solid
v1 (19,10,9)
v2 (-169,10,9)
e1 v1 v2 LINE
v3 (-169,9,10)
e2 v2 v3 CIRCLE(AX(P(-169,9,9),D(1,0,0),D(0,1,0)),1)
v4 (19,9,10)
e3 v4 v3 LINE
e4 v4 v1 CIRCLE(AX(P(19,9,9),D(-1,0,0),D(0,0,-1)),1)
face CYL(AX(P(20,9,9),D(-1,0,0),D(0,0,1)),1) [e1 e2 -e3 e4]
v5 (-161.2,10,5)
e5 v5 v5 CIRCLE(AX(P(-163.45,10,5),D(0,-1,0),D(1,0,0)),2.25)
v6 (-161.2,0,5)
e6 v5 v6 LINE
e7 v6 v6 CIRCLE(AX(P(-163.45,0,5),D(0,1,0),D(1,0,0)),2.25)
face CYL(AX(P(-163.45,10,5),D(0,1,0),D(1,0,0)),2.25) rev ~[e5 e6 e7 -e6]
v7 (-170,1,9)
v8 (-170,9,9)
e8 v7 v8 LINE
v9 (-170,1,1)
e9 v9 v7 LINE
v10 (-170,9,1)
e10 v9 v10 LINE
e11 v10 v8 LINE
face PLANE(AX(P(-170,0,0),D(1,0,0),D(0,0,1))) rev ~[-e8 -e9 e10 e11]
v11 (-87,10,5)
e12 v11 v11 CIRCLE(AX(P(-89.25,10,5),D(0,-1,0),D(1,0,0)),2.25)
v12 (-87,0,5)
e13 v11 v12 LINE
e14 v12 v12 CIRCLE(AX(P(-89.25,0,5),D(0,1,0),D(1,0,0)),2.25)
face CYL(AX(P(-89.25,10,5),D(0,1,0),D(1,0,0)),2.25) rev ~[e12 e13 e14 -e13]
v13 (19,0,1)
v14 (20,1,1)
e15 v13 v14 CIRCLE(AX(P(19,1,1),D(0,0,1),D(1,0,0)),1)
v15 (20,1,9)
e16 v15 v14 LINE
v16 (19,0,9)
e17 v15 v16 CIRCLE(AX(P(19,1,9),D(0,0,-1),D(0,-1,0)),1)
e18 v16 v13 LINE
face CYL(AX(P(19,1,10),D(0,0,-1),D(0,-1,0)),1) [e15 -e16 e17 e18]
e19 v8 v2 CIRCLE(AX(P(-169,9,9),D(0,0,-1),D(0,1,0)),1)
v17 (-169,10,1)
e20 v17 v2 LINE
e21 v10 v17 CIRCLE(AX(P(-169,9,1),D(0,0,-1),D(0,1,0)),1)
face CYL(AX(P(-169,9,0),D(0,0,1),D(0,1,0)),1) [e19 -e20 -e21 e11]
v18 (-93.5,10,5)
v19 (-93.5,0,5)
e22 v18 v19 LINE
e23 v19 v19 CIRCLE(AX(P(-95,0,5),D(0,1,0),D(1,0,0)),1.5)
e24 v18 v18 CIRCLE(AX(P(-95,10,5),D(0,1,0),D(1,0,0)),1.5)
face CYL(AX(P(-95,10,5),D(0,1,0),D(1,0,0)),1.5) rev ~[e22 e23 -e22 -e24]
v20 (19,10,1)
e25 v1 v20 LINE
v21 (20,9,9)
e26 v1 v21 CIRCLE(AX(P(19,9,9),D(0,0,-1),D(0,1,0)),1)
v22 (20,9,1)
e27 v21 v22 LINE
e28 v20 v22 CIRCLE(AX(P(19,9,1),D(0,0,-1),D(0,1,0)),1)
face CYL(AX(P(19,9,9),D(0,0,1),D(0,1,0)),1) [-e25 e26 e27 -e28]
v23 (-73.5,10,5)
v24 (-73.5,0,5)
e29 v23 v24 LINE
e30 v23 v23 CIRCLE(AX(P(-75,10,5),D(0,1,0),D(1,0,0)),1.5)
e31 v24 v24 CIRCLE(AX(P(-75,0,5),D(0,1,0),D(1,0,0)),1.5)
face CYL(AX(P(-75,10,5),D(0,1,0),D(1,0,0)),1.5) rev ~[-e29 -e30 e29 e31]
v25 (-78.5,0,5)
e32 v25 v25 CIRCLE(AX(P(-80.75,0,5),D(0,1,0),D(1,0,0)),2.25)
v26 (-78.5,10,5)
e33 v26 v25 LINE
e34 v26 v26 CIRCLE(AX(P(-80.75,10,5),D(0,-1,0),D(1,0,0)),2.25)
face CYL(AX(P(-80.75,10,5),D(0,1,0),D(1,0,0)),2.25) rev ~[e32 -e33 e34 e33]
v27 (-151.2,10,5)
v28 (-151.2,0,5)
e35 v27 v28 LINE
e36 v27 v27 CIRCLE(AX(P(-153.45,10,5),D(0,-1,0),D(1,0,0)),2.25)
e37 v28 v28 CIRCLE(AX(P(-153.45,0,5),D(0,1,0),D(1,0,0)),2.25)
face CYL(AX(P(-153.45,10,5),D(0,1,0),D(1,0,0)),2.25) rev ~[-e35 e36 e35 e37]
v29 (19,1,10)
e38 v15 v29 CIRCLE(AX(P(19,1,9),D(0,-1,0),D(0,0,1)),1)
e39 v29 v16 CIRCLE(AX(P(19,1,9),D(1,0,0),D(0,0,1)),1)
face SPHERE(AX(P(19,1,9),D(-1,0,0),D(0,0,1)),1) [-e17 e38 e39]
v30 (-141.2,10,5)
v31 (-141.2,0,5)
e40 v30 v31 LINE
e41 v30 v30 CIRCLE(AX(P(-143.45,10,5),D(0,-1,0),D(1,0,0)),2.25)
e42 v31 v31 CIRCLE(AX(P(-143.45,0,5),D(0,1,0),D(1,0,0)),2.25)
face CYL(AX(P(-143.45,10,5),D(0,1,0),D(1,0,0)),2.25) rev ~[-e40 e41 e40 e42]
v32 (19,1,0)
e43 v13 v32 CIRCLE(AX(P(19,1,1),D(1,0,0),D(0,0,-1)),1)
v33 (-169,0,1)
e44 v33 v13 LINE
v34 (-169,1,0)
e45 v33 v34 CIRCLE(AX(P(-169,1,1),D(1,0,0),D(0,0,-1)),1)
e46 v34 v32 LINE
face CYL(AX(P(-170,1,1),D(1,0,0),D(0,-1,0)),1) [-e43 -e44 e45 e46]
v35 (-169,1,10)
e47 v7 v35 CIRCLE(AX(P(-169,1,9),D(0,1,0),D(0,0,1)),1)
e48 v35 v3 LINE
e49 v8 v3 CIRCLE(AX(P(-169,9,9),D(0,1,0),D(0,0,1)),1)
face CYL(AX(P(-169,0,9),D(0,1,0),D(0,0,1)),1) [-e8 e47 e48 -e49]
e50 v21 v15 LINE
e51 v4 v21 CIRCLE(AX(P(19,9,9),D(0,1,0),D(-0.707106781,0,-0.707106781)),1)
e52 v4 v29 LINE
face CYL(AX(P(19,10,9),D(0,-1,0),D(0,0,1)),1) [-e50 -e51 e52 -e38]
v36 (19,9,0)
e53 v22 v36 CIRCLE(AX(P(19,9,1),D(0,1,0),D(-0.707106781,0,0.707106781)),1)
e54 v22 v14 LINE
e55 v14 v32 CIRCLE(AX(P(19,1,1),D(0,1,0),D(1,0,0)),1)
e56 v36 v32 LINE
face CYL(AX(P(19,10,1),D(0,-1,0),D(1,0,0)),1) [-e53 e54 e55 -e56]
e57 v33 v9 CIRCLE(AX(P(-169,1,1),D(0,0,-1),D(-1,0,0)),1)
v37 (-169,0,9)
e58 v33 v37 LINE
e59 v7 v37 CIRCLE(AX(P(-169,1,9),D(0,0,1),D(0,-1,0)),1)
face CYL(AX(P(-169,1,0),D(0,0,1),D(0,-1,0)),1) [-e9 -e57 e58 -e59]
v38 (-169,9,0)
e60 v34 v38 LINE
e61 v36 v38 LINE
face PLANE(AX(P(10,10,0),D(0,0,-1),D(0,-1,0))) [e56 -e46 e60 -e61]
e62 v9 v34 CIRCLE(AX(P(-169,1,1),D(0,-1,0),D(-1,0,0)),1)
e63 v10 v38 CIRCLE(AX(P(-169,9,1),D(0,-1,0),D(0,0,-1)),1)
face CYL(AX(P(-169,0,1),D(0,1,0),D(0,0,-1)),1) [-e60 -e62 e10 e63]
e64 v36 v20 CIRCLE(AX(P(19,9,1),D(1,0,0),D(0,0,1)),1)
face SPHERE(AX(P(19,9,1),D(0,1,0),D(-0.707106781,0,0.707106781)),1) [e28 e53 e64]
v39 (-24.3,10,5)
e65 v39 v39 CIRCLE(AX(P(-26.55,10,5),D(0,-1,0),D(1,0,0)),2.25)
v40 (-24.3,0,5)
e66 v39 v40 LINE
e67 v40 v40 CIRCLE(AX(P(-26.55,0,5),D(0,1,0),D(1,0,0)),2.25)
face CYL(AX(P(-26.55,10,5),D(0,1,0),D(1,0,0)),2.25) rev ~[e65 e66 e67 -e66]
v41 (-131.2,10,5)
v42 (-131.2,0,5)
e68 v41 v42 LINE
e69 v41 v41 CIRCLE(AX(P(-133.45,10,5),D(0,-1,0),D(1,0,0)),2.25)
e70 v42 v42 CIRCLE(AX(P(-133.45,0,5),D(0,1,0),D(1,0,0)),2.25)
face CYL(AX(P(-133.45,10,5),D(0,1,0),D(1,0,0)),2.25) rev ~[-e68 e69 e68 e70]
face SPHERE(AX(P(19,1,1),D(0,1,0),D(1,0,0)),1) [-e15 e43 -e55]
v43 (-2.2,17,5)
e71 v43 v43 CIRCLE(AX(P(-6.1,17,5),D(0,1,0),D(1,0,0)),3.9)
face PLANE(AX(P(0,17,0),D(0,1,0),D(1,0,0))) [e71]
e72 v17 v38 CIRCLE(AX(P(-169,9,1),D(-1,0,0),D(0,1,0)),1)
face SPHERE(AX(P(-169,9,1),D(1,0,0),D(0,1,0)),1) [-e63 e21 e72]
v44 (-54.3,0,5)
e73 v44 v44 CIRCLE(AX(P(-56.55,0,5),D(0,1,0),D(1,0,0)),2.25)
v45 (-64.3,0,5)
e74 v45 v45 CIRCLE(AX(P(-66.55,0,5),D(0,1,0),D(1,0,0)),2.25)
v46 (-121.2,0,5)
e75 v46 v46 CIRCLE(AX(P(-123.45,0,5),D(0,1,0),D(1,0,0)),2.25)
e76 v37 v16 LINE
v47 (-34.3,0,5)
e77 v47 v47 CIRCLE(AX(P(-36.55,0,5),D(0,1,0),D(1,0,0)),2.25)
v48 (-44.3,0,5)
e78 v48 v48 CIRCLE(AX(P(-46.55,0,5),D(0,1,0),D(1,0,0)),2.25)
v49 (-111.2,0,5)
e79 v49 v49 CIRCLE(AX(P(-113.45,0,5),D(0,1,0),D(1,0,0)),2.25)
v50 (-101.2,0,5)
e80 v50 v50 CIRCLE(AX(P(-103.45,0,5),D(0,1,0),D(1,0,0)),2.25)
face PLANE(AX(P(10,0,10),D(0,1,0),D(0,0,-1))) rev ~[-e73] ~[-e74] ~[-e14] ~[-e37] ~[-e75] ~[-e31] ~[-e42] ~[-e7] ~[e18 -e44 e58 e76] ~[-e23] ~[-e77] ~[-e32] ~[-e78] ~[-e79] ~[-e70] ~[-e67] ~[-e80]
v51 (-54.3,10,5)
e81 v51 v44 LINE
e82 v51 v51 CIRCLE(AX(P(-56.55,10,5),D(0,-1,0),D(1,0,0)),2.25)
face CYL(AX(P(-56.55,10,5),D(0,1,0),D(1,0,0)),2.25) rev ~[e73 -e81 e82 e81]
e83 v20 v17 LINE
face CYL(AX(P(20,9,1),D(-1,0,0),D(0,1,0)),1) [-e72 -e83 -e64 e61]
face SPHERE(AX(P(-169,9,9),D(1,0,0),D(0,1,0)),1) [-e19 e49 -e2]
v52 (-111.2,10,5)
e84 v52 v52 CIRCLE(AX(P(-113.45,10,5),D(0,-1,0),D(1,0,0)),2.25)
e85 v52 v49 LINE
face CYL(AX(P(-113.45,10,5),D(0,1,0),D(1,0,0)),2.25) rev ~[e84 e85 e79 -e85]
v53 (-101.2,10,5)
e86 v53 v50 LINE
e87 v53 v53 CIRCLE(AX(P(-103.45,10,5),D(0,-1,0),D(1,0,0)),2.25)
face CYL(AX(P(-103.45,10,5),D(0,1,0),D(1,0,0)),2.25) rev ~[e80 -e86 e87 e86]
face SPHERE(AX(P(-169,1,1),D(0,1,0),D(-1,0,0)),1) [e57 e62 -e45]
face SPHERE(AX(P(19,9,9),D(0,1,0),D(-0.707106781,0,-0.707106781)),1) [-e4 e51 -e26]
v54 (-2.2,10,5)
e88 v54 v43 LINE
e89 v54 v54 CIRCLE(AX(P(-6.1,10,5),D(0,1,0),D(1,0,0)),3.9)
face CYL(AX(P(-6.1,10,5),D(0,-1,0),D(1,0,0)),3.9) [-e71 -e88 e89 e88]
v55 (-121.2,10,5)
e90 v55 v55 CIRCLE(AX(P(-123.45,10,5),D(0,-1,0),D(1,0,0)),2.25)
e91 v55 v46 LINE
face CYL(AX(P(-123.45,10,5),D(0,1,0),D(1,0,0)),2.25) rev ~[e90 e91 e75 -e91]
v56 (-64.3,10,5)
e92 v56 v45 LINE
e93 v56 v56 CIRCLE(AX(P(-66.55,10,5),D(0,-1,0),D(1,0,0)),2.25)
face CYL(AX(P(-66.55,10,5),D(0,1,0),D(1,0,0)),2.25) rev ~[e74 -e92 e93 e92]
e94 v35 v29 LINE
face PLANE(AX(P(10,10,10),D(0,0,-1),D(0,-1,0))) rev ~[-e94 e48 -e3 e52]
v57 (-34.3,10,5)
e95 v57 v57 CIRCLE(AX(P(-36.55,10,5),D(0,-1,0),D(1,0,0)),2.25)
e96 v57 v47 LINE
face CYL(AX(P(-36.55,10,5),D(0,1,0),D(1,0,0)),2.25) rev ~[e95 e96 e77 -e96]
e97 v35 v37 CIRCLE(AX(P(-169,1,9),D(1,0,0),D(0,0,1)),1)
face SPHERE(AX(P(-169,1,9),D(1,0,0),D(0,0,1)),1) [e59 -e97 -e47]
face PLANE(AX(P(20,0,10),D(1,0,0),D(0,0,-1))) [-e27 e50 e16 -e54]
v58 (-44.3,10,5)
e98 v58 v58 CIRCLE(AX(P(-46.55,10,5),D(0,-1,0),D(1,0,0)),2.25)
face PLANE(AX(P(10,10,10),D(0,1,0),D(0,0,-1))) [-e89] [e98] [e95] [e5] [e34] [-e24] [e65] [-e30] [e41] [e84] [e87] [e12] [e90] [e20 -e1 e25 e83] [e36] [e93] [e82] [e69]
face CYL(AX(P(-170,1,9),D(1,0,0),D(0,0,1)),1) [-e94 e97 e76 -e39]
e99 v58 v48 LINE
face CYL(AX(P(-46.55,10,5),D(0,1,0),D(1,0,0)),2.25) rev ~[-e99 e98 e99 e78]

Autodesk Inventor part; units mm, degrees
ref_plane "YZ Plane" through (0, 0, 0) normal (1, 0, 0) x (0, 1, 0)
ref_plane "XZ Plane" through (0, 0, 0) normal (0, 1, 0) x (-1, 0, 0)
ref_plane "XY Plane" through (0, 0, 0) normal (0, 0, 1) x (1, 0, 0)
sketch "Sketch1" plane through (0, 0, 0) normal (0, 1, 0) x (-1, 0, 0)
  line L0 (0, 0) -> (170, 0)
  line L1 (170, 0) -> (170, 10)
  line L2 (170, 10) -> (0, 10)
  line L3 (0, 10) -> (0, 0)
  dimension "d0" = 170
  dimension "d1" = 10
extrude "Extrusion1" add sketch "Sketch1" along normal blind 10
sketch "Sketch2" plane through (0, 10, 0) normal (0, 1, 0) x (1, 0, 0)
  line L0 (0, -10) -> (0, 0) projected
  line L1 (0, -5) -> (-2.2, -5)
  circle A0 centre (-6.1, -5) radius 3.9
  line L2 (0, 0) -> (-170, 0) projected
  line L3 (-170, -10) -> (0, -10) projected
  circle A1 centre (-75, -5) radius 1.5
  circle A2 centre (-95, -5) radius 1.5
  dimension "d35" = 10
  dimension "d4" = 2.2
  dimension "d8" = 3
  dimension "d9" = 3
extrude "Extrusion2" cut sketch "Sketch2" against normal blind 10 contours A1
extrude "Extrusion3" cut sketch "Sketch2" against normal blind 10 contours A2
extrude "Extrusion4" add sketch "Sketch2" along normal blind 7 contours A0
sketch "Sketch3" plane through (0, 10, 0) normal (0, 1, 0) x (1, 0, 0)
  line L0 (-170, 0) -> (-170, -10) projected
  line L1 (-170, -5) -> (-10, -5)
  circle A0 centre (-6.1, -5) radius 3.9 projected
  line L2 (-165.7, -5) -> (-163.45, -5)
  circle A1 centre (-163.45, -5) radius 2.25
  circle A2 centre (-153.45, -5) radius 2.25
  circle A3 centre (-143.45, -5) radius 2.25
  circle A4 centre (-133.45, -5) radius 2.25
  circle A5 centre (-123.45, -5) radius 2.25
  circle A6 centre (-113.45, -5) radius 2.25
  circle A7 centre (-103.45, -5) radius 2.25
  circle A8 centre (-95, -5) radius 1.5 projected
  line L3 (-93.5, -5) -> (-93.5, -7.9104)
  circle A9 centre (-75, -5) radius 1.5 projected
  line L4 (-76.5, -5) -> (-76.5, -7.25)
  line L5 (-93.5, -5) -> (-76.5, -5)
  line L6 (-85, -5) -> (-93.5, -5)
  line L7 (-85, -5) -> (-76.5, -5)
  circle A10 centre (-80.75, -5) radius 2.25
  circle A11 centre (-89.25, -5) radius 2.25
  line L8 (-10, -5) -> (-12, -5)
  line L9 (-10, -5) -> (-14.3, -5)
  line L10 (-14.3, -5) -> (-16.55, -5)
  circle A12 centre (-16.55, -5) radius 2.25
  circle A13 centre (-26.55, -5) radius 2.25
  circle A14 centre (-36.55, -5) radius 2.25
  circle A15 centre (-46.55, -5) radius 2.25
  circle A16 centre (-56.55, -5) radius 2.25
  circle A17 centre (-66.55, -5) radius 2.25
  point P0 (0, 0)
  point P1 (-155.7, -5)
  point P2 (-145.7, -5)
  point P3 (-135.7, -5)
  point P4 (-125.7, -5)
  point P5 (-115.7, -5)
  point P6 (-105.7, -5)
  point P7 (-24.3, -5)
  point P8 (-34.3, -5)
  point P9 (-44.3, -5)
  point P10 (-54.3, -5)
  point P11 (-64.3, -5)
  dimension "d20" = 10
  dimension "d32" = 10
extrude "Extrusion5" cut sketch "Sketch3" against normal blind 10 contours A1 L1 | L1 A1 | L1 A12 | L1 A12 | A2 L1 | L1 A2 | A3 L1 | L1 A3 | A4 L1 | L1 A4 | A5 L1 | L1 A5 | A6 L1 | L1 A6 | A7 L1 | L1 A7 | A11 L1 | L1 A11 | A10 L1 | L1 A10 | A17 L1 | L1 A17 | A16 L1 | L1 A16 | A15 L1 | L1 A15 | A14 L1 | L1 A14 | A13 L1 | L1 A13
thread "Thread1" size "M3x0.5" class "6H" standard "ANSI Metric M Profile" full length
thread "Thread2" size "M3x0.5" class "6H" standard "ANSI Metric M Profile" full length
sketch "Sketch4" plane through (0, 10, 0) normal (0, 1, 0) x (1, 0, 0)
  circle A0 centre (-16.55, -5) radius 2.25 projected
  circle A1 centre (-16.55, -5) radius 2.25
  point P0 (0, 0)
extrude "Extrusion6" add sketch "Sketch4" against normal blind 10
sketch "Sketch5" plane through (0, 0, 10) normal (1, 0, 0) x (0, 0, -1)
  line L0 (10, 0) -> (0, 0) projected
  line L1 (0, 0) -> (0, 10) projected
  line L2 (10, 0) -> (0, 0)
  line L3 (0, 0) -> (0, 10)
  line L4 (0, 10) -> (10, 10)
  line L5 (10, 10) -> (10, 0)
extrude "Extrusion7" add sketch "Sketch5" along normal blind 10
sketch "Sketch6" plane through (10, 0, 10) normal (1, 0, 0) x (0, 0, -1)
  line L0 (0, 0) -> (10, 0) projected
  line L1 (0, 10) -> (0, 0) projected
  line L2 (10, 0) -> (0, 0)
  line L3 (0, 0) -> (0, 10)
  line L4 (0, 10) -> (10, 10)
  line L5 (10, 10) -> (10, 0)
extrude "Extrusion8" add sketch "Sketch6" along normal blind 10
sketch "Sketch7" plane through (0, 10, 0) normal (0, 1, 0) x (1, 0, 0)
  point P0 (0, 0)
fillet "Fillet3" radius 1 11 edges at (-75, 10, 10) (-75, 0, 10) (-75, 10, 0) (20, 5, 10) (20, 5, 0) (20, 0, 5) (-170, 10, 5) (-170, 5, 10) (-170, 5, 0) (-170, 0, 5) (-75, 0, 0)
fillet "Fillet4" radius 1 3 edges at (19.7071, 9.7071, 9.7071) (19.7071, 9.7071, 0.2929) (20, 10, 5)
properties part number "brazo apoyo"
